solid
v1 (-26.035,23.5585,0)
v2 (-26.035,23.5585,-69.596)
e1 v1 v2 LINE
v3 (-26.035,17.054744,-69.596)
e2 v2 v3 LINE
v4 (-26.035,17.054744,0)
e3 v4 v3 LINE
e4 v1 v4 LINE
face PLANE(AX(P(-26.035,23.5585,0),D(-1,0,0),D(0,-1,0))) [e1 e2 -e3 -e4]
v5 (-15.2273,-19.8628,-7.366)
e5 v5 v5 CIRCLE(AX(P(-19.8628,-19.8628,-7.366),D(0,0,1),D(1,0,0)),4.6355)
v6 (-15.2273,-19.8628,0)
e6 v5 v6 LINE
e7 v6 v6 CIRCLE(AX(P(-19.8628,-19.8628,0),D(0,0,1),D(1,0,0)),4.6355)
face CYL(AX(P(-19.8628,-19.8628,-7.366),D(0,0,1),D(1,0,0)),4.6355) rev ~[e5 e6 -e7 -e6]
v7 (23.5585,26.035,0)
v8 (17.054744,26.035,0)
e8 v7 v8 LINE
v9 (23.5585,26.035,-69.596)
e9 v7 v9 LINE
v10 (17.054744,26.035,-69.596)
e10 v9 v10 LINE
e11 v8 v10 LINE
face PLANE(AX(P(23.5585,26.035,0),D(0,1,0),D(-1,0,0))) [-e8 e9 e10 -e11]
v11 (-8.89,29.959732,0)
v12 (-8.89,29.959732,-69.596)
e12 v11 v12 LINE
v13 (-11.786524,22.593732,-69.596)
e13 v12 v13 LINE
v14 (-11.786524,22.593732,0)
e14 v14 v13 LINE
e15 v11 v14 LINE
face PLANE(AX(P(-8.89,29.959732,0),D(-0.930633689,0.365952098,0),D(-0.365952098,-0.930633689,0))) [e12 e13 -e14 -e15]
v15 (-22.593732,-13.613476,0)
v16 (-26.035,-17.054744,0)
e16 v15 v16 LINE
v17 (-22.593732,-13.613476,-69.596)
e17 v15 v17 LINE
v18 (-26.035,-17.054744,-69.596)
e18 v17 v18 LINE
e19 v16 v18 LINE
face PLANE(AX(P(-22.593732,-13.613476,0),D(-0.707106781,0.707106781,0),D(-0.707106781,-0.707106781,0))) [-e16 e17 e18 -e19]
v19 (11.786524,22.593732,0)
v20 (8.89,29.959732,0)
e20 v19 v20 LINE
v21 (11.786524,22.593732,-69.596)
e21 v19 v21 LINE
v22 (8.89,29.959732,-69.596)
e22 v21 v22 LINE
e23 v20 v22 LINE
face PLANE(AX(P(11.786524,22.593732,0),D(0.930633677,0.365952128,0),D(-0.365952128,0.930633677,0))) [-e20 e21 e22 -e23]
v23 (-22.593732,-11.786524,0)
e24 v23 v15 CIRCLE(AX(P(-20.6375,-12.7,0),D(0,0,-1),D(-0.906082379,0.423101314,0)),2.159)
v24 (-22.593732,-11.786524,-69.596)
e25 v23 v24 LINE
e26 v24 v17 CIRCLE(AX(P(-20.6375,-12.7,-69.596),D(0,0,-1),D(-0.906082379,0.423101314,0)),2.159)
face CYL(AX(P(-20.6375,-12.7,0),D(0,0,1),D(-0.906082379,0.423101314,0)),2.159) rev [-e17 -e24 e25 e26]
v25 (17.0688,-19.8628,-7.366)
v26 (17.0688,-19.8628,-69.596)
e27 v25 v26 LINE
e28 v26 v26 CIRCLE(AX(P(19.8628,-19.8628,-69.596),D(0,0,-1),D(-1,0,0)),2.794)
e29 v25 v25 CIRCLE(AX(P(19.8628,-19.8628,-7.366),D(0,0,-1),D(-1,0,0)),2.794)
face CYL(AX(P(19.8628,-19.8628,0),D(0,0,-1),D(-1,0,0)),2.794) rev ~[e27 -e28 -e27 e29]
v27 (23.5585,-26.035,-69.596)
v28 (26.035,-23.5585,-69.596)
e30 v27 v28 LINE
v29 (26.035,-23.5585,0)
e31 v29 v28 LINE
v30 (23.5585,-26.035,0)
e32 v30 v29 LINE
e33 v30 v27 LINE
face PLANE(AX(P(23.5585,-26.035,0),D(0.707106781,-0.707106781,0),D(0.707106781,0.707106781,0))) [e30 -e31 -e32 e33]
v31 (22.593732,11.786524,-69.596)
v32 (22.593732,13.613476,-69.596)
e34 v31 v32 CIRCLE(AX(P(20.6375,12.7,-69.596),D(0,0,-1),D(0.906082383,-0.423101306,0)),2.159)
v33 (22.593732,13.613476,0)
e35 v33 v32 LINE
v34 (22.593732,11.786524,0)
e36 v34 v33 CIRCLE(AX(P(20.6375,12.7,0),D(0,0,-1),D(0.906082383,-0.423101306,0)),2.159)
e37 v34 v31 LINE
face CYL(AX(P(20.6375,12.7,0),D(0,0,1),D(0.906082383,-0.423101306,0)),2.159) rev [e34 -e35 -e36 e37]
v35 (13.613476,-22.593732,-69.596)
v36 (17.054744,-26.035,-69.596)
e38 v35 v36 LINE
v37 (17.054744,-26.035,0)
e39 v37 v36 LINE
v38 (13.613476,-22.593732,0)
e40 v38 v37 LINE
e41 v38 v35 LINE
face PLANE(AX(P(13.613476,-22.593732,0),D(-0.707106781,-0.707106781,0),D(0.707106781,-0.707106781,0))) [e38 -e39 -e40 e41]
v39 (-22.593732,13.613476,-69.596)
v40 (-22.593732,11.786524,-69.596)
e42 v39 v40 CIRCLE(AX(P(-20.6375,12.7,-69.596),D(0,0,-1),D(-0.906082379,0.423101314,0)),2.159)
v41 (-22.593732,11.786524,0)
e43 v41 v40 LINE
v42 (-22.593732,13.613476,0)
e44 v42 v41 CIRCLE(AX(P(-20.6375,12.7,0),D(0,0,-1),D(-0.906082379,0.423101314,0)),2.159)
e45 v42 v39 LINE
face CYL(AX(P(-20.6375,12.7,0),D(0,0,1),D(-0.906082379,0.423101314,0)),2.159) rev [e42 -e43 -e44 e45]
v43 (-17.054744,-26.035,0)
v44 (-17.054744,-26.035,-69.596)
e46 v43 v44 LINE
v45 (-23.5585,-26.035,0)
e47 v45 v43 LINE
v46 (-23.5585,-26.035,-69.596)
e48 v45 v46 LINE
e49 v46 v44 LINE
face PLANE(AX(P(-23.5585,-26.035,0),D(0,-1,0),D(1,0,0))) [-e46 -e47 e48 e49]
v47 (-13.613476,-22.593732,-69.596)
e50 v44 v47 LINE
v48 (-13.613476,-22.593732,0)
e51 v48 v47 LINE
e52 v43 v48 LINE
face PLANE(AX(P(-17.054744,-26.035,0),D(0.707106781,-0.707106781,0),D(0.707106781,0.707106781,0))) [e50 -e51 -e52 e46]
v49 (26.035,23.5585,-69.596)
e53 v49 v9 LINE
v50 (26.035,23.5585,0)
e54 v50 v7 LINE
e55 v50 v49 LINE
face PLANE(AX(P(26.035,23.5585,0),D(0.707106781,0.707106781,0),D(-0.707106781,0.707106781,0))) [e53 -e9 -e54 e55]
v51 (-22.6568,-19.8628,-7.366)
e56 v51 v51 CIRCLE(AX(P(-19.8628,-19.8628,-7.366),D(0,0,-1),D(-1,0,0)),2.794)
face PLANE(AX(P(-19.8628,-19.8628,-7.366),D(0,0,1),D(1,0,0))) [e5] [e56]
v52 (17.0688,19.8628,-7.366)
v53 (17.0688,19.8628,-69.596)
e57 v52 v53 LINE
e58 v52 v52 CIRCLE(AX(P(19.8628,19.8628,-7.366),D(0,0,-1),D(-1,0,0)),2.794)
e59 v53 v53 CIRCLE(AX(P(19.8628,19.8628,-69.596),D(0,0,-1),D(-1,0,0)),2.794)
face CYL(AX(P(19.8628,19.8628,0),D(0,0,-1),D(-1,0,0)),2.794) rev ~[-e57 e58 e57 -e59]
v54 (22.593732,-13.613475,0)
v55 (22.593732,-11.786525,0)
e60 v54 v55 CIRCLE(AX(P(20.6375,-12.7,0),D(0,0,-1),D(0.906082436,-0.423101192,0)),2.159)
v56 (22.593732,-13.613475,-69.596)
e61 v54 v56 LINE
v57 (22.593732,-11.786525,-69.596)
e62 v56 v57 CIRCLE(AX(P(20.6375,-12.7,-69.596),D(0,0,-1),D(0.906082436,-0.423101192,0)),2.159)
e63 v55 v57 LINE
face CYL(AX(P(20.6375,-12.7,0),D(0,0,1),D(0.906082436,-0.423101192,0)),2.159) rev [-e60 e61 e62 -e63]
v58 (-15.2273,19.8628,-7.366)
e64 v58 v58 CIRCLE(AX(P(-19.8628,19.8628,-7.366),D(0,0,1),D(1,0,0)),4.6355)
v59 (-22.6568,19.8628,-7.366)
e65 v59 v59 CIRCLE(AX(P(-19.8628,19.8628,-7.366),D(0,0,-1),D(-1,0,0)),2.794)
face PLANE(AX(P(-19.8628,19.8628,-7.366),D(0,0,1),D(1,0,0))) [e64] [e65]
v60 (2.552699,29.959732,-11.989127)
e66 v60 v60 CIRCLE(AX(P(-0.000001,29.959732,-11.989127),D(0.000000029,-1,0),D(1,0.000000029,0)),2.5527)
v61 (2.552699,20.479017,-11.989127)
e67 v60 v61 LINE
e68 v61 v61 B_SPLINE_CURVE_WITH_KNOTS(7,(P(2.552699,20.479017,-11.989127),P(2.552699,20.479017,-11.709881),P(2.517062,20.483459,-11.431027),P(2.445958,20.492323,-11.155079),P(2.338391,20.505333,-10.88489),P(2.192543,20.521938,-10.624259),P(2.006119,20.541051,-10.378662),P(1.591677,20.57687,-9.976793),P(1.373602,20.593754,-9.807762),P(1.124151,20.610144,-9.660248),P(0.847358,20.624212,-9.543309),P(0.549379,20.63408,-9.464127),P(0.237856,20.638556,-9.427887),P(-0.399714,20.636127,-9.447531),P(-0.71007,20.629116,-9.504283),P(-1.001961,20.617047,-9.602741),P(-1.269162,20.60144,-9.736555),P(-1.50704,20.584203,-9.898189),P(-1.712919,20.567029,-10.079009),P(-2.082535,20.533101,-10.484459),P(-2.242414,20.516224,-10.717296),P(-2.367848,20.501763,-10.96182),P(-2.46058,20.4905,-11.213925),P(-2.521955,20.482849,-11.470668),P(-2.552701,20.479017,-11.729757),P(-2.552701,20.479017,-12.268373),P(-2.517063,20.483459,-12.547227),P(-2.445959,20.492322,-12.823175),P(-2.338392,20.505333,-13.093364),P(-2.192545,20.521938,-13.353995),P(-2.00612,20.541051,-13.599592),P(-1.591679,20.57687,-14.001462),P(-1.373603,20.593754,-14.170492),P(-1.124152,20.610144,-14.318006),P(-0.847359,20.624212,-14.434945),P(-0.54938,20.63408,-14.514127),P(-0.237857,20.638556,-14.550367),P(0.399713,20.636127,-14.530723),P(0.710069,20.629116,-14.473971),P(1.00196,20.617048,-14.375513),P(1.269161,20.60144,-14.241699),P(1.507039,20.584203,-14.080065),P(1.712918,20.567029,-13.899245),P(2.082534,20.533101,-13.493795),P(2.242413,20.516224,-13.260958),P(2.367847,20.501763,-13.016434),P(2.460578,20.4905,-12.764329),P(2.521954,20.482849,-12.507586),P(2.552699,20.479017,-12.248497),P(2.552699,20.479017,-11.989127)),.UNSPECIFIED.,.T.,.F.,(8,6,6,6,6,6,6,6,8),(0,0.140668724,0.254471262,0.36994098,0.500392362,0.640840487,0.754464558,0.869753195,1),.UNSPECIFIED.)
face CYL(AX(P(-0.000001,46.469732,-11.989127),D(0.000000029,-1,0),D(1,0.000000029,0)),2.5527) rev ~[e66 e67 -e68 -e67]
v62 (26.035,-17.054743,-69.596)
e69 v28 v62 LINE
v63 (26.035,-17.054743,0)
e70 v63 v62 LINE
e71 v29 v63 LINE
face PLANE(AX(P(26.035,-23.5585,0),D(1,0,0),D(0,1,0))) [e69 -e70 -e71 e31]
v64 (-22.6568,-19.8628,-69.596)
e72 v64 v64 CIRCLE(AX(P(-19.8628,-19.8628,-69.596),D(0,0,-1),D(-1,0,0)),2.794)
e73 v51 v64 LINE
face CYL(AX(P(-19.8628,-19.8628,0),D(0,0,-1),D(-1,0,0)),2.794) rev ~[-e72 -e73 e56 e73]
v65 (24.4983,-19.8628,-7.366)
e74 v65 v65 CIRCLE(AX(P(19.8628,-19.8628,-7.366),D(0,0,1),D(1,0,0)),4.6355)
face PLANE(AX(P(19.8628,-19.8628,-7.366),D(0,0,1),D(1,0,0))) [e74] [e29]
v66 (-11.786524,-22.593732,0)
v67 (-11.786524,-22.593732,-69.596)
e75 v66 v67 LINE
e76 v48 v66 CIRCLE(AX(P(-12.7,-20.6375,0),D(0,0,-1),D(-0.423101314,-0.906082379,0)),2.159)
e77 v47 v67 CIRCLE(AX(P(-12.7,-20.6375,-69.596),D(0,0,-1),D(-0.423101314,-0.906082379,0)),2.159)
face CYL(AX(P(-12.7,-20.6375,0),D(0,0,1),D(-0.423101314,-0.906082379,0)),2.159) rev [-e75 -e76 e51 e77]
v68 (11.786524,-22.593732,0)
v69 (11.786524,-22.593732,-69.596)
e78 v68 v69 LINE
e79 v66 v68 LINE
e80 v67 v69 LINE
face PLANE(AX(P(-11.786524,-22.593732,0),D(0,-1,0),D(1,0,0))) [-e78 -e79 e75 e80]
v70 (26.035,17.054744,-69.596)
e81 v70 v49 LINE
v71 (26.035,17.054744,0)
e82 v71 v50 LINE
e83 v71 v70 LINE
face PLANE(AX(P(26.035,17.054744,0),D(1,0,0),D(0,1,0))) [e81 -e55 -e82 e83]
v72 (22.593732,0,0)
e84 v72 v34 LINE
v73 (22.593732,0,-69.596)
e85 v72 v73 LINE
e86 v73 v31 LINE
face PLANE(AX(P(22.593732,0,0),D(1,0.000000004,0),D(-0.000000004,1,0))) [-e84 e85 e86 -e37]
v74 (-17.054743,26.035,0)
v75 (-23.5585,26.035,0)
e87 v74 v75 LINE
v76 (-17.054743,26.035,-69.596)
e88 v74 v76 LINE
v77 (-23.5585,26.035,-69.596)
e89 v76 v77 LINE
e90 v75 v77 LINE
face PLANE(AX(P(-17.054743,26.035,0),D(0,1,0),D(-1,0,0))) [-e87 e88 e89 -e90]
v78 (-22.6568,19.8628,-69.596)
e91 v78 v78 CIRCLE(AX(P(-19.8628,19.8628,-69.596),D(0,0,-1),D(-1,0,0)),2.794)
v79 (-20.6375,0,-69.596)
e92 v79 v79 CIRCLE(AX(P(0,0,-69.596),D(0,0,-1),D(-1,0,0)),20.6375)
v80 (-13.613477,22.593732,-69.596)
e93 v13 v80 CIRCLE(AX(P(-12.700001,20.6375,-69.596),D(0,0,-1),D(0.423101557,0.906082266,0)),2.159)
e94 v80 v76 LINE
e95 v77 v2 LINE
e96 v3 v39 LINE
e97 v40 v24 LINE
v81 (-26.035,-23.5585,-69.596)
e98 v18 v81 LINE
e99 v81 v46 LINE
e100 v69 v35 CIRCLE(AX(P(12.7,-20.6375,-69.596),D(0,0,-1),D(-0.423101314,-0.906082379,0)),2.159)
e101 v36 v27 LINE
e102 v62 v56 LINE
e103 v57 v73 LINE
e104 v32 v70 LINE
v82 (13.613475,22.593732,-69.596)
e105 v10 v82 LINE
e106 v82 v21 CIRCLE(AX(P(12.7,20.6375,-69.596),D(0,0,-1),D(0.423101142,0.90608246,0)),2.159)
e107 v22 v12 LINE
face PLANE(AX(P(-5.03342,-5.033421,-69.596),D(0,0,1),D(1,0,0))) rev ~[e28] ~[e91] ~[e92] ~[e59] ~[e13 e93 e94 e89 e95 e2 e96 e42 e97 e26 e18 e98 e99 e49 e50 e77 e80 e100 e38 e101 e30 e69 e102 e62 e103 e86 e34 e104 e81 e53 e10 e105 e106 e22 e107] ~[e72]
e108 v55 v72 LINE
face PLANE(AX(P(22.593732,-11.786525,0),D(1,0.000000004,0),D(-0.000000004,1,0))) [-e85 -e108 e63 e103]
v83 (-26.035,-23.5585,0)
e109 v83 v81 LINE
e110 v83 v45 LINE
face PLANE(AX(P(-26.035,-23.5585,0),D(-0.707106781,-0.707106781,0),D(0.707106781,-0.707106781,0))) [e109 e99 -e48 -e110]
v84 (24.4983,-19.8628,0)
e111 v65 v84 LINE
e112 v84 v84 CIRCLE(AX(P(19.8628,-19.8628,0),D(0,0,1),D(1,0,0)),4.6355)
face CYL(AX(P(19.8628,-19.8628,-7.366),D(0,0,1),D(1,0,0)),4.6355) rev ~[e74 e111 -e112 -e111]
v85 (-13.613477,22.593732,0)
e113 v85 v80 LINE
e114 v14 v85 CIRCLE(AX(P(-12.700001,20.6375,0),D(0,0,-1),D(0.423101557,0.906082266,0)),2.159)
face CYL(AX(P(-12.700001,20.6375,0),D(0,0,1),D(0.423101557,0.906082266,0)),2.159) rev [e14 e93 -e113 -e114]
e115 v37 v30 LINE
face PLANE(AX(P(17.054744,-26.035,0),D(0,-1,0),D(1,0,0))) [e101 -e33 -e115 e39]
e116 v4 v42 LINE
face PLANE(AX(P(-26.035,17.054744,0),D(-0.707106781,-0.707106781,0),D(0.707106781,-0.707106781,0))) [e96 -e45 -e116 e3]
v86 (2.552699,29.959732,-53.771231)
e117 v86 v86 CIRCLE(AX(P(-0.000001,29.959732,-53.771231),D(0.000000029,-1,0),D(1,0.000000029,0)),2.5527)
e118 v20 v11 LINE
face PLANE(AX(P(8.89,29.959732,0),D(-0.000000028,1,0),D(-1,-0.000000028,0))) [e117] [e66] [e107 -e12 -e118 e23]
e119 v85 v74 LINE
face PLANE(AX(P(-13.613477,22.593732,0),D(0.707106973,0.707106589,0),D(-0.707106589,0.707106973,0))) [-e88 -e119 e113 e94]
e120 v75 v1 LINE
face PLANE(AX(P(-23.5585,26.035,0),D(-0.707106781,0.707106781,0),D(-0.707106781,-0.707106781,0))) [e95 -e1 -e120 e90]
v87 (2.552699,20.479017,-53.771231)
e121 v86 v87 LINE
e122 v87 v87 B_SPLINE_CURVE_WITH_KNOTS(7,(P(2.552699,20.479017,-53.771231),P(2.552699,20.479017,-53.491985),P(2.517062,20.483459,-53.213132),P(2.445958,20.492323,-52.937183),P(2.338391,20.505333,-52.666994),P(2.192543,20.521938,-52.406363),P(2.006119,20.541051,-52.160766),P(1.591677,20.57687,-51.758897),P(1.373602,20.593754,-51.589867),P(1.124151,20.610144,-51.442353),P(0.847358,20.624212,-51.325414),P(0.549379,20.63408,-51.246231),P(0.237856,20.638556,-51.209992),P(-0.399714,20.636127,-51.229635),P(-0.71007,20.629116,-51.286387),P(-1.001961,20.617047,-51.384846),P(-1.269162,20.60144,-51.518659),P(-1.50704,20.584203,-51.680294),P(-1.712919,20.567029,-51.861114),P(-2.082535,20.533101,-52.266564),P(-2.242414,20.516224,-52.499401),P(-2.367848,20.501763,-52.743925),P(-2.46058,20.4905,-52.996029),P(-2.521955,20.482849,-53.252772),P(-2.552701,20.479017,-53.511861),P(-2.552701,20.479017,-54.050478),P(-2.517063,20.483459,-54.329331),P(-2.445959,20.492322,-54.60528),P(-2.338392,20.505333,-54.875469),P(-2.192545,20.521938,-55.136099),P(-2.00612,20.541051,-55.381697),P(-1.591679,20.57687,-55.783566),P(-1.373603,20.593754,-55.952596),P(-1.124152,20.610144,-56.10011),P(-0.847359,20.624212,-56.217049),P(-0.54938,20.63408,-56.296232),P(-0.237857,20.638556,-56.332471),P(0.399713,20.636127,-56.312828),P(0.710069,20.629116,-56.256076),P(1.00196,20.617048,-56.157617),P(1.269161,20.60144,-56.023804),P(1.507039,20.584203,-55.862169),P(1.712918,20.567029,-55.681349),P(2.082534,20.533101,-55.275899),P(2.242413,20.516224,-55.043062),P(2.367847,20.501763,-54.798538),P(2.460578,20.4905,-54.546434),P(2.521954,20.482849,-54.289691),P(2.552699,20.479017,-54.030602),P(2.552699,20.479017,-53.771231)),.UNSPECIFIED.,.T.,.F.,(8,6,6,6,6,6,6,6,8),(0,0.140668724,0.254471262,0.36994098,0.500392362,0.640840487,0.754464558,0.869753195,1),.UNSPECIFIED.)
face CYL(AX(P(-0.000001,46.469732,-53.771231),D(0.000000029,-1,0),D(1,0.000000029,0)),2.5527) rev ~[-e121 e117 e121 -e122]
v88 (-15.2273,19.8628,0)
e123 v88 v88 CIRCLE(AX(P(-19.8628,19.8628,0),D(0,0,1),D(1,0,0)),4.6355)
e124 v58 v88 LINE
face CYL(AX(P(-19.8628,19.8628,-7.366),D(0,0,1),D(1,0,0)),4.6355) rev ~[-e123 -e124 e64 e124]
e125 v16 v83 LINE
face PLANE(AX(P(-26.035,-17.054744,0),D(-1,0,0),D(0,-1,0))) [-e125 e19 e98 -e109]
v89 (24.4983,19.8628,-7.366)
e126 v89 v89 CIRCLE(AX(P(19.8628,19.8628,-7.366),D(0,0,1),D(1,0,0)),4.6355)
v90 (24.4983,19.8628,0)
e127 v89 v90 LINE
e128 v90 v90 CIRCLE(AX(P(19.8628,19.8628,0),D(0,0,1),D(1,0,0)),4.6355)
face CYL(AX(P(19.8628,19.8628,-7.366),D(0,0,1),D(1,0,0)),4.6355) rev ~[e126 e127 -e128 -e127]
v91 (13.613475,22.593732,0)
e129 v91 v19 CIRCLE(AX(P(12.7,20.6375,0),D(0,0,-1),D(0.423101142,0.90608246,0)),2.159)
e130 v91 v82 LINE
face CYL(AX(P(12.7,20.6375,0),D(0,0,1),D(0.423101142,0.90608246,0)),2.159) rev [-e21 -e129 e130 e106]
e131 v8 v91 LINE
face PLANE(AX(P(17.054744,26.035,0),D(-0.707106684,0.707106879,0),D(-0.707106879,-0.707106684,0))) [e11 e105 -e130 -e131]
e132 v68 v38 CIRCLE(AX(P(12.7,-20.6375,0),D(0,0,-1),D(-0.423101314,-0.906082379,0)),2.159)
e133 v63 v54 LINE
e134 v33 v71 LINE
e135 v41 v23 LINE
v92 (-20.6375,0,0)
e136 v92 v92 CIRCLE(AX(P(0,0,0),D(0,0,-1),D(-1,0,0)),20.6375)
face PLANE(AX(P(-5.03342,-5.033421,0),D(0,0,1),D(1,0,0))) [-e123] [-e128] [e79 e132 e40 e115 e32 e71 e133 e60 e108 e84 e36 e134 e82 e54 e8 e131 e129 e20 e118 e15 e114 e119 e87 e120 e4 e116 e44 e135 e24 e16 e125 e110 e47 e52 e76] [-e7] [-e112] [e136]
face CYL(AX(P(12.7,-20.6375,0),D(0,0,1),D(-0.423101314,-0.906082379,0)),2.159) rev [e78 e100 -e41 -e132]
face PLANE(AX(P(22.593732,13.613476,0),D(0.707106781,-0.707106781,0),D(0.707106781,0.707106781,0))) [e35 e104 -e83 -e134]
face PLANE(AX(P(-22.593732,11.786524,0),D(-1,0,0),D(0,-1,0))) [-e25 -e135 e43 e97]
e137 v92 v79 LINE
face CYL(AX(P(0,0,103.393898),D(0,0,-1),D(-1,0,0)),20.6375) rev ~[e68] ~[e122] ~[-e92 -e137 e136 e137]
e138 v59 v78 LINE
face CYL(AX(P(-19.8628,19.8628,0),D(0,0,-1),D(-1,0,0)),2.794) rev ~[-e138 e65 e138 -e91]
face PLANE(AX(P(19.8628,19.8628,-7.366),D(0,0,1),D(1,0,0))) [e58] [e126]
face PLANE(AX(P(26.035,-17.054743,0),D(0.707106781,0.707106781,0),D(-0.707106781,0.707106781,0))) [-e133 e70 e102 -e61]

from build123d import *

# Parameters (mm, degrees)
F0_R           = 4.6355
F1_DEPTH       = 69.596
F2_D           = 5.588
F2_CBORE_D     = 9.271
F2_CBORE_DEPTH = 7.366
F3_D           = 41.275
F5_D           = 5.1054
F5_DEPTH       = 16.51
F5_TIP         = 1.5338169022


# Not quite as in the source:
# - ends of sketch curves that miss each other by under 0.0002 mm in the source are joined


with BuildPart() as f1:
    # F0 (on Top) → F1 (new body)
    with BuildSketch(Plane.XY):
        with BuildLine():
            Line((0, 20.828), (0, 22.5937319184))
            Line((0, 22.5937319184), (-11.7865243948, 22.593731583))
            ThreePointArc((-11.7865243948, 22.593731583), (-12.6999991591, 18.4785002754), (-13.613476896, 22.593731531))
            Line((-13.613476896, 22.593731531), (-17.0547434947, 26.035))
            Line((-17.0547434947, 26.035), (-23.5585, 26.035))
            Line((-23.5585, 26.035), (-26.035, 23.5585))
            Line((-26.035, 23.5585), (-26.035, 17.0547438789))
            Line((-26.035, 17.0547438789), (-22.5937318573, 13.6134757362))
            ThreePointArc((-22.5937318573, 13.6134757362), (-18.4785, 12.7), (-22.5937318573, 11.7865242638))
            Line((-22.5937318573, 11.7865242638), (-22.5937318573, -11.7865242638))
            ThreePointArc((-22.5937318573, -11.7865242638), (-18.4785, -12.7), (-22.5937318573, -13.6134757362))
            Line((-22.5937318573, -13.6134757362), (-26.035, -17.0547438789))
            Line((-26.035, -17.0547438789), (-26.035, -23.5585))
            Line((-26.035, -23.5585), (-23.5585, -26.035))
            Line((-23.5585, -26.035), (-17.0547438789, -26.035))
            Line((-17.0547438789, -26.035), (-13.6134757362, -22.5937318573))
            ThreePointArc((-13.6134757362, -22.5937318573), (-12.7, -18.4785), (-11.7865242638, -22.5937318573))
            Line((-11.7865242638, -22.5937318573), (11.7865242638, -22.5937318573))
            ThreePointArc((11.7865242638, -22.5937318573), (12.7, -18.4785), (13.6134757362, -22.5937318573))
            Line((13.6134757362, -22.5937318573), (17.0547438789, -26.035))
            Line((17.0547438789, -26.035), (23.5585, -26.035))
            Line((23.5585, -26.035), (26.035, -23.5585))
            Line((26.035, -23.5585), (26.035, -17.0547434947))
            Line((26.035, -17.0547434947), (22.5937319796, -13.6134754743))
            ThreePointArc((22.5937319796, -13.6134754743), (18.4785, -12.7000000097), (22.5937319714, -11.7865245082))
            Line((22.5937319714, -11.7865245082), (22.5937319184, 0))
            Line((22.5937319184, 0), (20.828, 0))
            ThreePointArc((20.828, 0), (-14.7276200386, -14.7276200386), (0, 20.828))
        make_face()
        with Locations((-19.8628, -19.8628)):
            Circle(F0_R, mode=Mode.SUBTRACT)
        with Locations((19.8628, -19.8628)):
            Circle(F0_R, mode=Mode.SUBTRACT)
        with Locations((-19.8628, 19.8628)):
            Circle(F0_R, mode=Mode.SUBTRACT)
        Polygon((0, 22.5937319184), (11.7865243948, 22.5937322538), (8.8899997904, 29.9597321714), (-8.89, 29.9597316654), (-11.7865243948, 22.593731583), align=None)
        with BuildLine():
            Line((26.035, 23.5585), (23.5585, 26.035))
            Line((23.5585, 26.035), (17.0547438789, 26.035))
            Line((17.0547438789, 26.035), (13.6134752367, 22.5937323058))
            ThreePointArc((13.6134752367, 22.5937323058), (12.6999999329, 18.4785002754), (11.7865243948, 22.5937322538))
            Line((11.7865243948, 22.5937322538), (0, 22.5937319184))
            Line((0, 22.5937319184), (0, 20.828))
            ThreePointArc((0, 20.828), (14.7276200386, 14.7276200386), (20.828, 0))
            Line((20.828, 0), (22.5937319184, 0))
            Line((22.5937319184, 0), (22.5937318655, 11.7865242814))
            ThreePointArc((22.5937318655, 11.7865242814), (18.4785, 12.6999999903), (22.5937318573, 13.6134757362))
            Line((22.5937318573, 13.6134757362), (26.035, 17.0547438789))
            Line((26.035, 17.0547438789), (26.035, 23.5585))
        make_face()
        with Locations((19.8628, 19.8628)):
            Circle(F0_R, mode=Mode.SUBTRACT)
        with Locations((19.8628, -19.8628)):
            Circle(F0_R)
        with Locations((19.8628, 19.8628)):
            Circle(F0_R)
        with Locations((-19.8628, 19.8628)):
            Circle(F0_R)
        with Locations((-19.8628, -19.8628)):
            Circle(F0_R)
        with BuildLine():
            ThreePointArc((20.828, 0), (14.7276200386, 14.7276200386), (0, 20.828))
            Line((0, 20.828), (0, 0))
            Line((0, 0), (20.828, 0))
        make_face()
        with BuildLine():
            Line((0, 0), (0, 20.828))
            ThreePointArc((0, 20.828), (-14.7276200386, -14.7276200386), (20.828, 0))
            Line((20.828, 0), (0, 0))
        make_face()
    extrude(amount=-F1_DEPTH)

    # F2 (through all)
    with Locations(Plane.XY):
        with Locations((-19.8628, 19.8628), (19.8628, 19.8628), (19.8628, -19.8628), (-19.8628, -19.8628)):
            CounterBoreHole(F2_D / 2, F2_CBORE_D / 2, F2_CBORE_DEPTH)

    # F3 (through all)
    with Locations(Plane.XY):
        with Locations((0, 0)):
            Hole(F3_D / 2)

    # F5
    with Locations(Plane(origin=(-8.526e-07, 29.9597319184, 0), x_dir=(-1, -2.85e-08, 0), z_dir=(-2.85e-08, 1, 0))):
        with Locations((0, -11.9891270243), (0, -53.7712314358)):
            Hole(F5_D / 2, depth=F5_DEPTH)
            with Locations((0, 0, -(F5_DEPTH + F5_TIP / 2))):  # 118° drill point
                Cone(0, F5_D / 2, F5_TIP, mode=Mode.SUBTRACT)


solid = f1.part
